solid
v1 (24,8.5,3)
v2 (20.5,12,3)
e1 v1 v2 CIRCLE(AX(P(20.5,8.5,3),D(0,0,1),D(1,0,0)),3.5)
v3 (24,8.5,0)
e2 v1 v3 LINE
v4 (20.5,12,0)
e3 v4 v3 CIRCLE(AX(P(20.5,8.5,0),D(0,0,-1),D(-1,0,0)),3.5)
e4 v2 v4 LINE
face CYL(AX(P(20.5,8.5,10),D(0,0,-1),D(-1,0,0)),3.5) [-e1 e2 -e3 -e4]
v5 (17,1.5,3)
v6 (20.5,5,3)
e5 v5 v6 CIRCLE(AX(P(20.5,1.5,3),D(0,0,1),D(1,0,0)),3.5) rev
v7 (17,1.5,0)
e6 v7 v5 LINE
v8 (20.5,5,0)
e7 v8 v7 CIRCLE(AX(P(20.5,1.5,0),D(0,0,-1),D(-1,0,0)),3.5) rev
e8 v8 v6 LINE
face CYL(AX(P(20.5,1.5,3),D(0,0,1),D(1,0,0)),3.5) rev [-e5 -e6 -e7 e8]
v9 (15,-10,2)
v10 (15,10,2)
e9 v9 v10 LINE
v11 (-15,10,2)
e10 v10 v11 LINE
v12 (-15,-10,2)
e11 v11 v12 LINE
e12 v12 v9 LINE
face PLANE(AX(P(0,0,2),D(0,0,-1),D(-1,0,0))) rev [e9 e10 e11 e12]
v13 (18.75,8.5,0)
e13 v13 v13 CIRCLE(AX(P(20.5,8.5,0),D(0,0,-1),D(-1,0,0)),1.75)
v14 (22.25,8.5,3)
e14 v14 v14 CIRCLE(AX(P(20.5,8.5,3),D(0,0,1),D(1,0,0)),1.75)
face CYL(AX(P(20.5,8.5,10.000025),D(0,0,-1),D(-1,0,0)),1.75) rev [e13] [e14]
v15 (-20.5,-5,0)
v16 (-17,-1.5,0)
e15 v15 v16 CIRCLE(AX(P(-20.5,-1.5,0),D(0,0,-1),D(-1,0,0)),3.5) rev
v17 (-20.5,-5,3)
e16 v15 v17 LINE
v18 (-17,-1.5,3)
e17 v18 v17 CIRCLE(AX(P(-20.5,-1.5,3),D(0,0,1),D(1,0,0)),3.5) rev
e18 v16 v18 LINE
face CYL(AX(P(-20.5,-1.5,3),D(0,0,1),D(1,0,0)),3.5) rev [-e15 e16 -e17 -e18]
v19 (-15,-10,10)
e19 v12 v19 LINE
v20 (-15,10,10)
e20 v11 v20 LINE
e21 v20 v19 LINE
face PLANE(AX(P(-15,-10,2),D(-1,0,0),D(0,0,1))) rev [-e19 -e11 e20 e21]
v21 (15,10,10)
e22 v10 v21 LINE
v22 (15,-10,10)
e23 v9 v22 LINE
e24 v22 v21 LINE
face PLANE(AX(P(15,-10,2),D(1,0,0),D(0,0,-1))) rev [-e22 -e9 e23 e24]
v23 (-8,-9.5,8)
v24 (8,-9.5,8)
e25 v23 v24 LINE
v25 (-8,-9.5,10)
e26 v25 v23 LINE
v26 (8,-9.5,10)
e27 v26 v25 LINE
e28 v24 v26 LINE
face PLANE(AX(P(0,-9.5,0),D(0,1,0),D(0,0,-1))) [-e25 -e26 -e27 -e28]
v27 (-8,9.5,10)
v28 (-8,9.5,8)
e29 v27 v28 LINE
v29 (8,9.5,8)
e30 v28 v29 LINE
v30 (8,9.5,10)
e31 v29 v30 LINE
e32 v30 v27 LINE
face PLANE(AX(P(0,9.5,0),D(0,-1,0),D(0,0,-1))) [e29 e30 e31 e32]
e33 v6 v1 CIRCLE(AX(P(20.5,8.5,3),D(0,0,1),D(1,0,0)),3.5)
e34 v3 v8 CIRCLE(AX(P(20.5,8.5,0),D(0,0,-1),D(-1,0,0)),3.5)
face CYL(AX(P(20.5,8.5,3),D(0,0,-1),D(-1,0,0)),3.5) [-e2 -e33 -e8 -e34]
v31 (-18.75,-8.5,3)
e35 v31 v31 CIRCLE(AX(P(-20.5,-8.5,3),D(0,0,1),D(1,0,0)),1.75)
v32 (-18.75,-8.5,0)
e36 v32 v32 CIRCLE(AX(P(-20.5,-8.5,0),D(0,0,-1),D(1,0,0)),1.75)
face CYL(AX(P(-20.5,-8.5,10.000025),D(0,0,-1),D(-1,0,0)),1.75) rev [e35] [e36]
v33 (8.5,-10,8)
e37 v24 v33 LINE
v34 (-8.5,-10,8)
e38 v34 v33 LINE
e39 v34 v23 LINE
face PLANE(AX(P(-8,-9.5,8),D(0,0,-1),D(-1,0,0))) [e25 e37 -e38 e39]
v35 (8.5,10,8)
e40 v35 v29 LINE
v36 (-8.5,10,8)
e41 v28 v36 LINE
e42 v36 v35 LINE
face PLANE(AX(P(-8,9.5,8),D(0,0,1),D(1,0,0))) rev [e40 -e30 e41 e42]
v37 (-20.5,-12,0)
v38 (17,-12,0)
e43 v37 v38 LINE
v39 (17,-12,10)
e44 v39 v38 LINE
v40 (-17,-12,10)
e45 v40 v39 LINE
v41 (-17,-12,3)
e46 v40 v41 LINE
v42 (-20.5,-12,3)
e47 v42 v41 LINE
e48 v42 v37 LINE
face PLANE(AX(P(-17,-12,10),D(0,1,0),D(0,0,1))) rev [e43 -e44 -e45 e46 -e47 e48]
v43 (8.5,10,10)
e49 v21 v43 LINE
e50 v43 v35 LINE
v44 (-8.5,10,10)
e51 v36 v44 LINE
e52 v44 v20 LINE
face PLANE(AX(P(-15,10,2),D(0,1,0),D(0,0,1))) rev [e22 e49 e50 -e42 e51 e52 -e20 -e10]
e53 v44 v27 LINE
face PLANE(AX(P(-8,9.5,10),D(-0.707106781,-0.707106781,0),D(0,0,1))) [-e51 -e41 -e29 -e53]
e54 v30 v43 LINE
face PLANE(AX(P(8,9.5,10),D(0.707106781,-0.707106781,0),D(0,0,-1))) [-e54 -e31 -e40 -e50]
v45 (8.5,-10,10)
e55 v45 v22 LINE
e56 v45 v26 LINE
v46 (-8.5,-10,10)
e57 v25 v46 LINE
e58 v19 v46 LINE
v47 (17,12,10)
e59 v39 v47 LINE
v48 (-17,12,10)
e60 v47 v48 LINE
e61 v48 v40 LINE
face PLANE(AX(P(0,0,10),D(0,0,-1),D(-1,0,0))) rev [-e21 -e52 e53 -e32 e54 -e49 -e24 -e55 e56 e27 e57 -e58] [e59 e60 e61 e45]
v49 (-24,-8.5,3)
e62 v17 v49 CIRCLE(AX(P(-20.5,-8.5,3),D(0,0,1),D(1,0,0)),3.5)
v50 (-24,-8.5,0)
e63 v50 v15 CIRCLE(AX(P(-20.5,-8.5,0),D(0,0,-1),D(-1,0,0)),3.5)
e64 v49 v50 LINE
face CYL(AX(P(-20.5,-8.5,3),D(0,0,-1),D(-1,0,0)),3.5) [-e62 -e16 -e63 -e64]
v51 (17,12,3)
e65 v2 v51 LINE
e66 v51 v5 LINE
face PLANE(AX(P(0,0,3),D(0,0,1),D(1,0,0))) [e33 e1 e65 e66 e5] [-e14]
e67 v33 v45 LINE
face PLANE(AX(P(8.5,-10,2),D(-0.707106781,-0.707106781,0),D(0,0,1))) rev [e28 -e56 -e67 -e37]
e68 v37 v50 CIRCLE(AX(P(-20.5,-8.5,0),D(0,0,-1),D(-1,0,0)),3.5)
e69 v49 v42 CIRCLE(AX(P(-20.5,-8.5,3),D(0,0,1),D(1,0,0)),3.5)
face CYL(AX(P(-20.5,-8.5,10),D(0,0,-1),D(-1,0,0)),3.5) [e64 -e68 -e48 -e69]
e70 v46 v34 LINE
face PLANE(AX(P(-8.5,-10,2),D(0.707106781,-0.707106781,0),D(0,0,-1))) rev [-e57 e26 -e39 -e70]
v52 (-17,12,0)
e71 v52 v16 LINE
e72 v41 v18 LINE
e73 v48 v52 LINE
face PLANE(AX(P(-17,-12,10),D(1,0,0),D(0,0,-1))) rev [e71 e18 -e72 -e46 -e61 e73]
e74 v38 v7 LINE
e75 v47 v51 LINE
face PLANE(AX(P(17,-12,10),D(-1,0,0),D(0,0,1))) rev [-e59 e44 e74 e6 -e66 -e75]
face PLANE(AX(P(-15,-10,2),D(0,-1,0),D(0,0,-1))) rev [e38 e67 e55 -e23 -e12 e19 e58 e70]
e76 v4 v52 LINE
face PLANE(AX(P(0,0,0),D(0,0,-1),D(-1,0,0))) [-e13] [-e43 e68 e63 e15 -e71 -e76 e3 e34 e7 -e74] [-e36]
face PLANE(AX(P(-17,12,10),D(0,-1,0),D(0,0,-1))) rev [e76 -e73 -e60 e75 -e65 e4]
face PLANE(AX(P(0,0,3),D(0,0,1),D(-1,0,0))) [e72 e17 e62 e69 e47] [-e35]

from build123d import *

# Parameters (mm, degrees)
SKETCH1_W                = 34
SKETCH1_H                = 24
BOSS_EXTRUDE1_DEPTH      = 10
SKETCH2_W                = 30
SKETCH2_H                = 20
CUT_EXTRUDE1_DEPTH       = 8
SKETCH3_W                = 16
SKETCH3_H                = 2
BOSS_EXTRUDE2_DEPTH      = 0.5
CHAMFER1_SIZE            = 0.5
SKETCH4_W                = 7
SKETCH4_H                = 7
BOSS_EXTRUDE3_DEPTH      = 3
FILLET1_R                = 3.5
SKETCH6_R                = 1.75
CUT_EXTRUDE2_DEPTH       = 29.635642127
CIRPATTERN2_COUNT        = 2
FILLET1_OF_CIRPATTERN2_R = 3.5
FILLET2_R                = 3.5


with BuildPart() as part:
    # Sketch1 → Boss-Extrude1 (new body)
    with BuildSketch(Plane.XY):
        Rectangle(SKETCH1_W, SKETCH1_H)
    extrude(amount=BOSS_EXTRUDE1_DEPTH)

    # Sketch2 → Cut-Extrude1 (cut)
    with BuildSketch(Plane.XY.offset(10)):
        Rectangle(SKETCH2_W, SKETCH2_H)
    extrude(amount=-CUT_EXTRUDE1_DEPTH, mode=Mode.SUBTRACT)

    # Sketch3 → Boss-Extrude2 (add)
    with BuildSketch(Plane.XZ.offset(-10)):
        with Locations((0, 9)):
            Rectangle(SKETCH3_W, SKETCH3_H)
    boss_extrude2 = extrude(amount=BOSS_EXTRUDE2_DEPTH)

    # Mirror1: Boss-Extrude2 across plane
    add(boss_extrude2.mirror(Plane.ZX))

    # Chamfer1
    chamfer1_edges = [part.edges().sort_by_distance(p)[0] for p in [
        (8, 10, 9),
        (-8, 10, 9),
        (-8, -10, 9),
        (8, -10, 9),
    ]]
    chamfer(chamfer1_edges, length=CHAMFER1_SIZE - 0.0001)  # a hair under: the kernel refuses the full size

    # Sketch4 → Boss-Extrude3 (add)
    with BuildSketch(Plane.XY):
        with Locations((20.5, 8.5)):
            Rectangle(SKETCH4_W, SKETCH4_H)
    boss_extrude3 = extrude(amount=BOSS_EXTRUDE3_DEPTH)

    # Fillet1
    fillet1_edges = [part.edges().sort_by_distance(p)[0] for p in [
        (24, 12, 1.5),
        (24, 5, 1.5),
    ]]
    fillet(fillet1_edges, radius=FILLET1_R - 0.0001)  # a hair under: the kernel refuses the full size

    # Sketch6 → Cut-Extrude2 (cut, through all)
    with BuildSketch(Plane(origin=(0, 0, 0), x_dir=(-1, 0, 0), z_dir=(0, 0, -1))):
        with Locations((-20.5, 8.5)):
            Circle(SKETCH6_R)
    cut_extrude2 = extrude(amount=-CUT_EXTRUDE2_DEPTH, mode=Mode.SUBTRACT)

    # CirPattern2: Boss-Extrude3, Cut-Extrude2 ×2 about axis
    cirpattern2_axis = Axis((0, 0, 0), (0, 0, 1))
    add([boss_extrude3.rotate(cirpattern2_axis, i * 360 / CIRPATTERN2_COUNT) for i in range(1, CIRPATTERN2_COUNT)])
    add([cut_extrude2.rotate(cirpattern2_axis, i * 360 / CIRPATTERN2_COUNT) for i in range(1, CIRPATTERN2_COUNT)], mode=Mode.SUBTRACT)

    # Fillet1 of CirPattern2
    fillet1_of_cirpattern2_edges = [part.edges().sort_by_distance(p)[0] for p in [
        (-24, -12, 1.5),
        (-24, -5, 1.5),
    ]]
    fillet(fillet1_of_cirpattern2_edges, radius=FILLET1_OF_CIRPATTERN2_R - 0.0001)  # a hair under: the kernel refuses the full size

    # Fillet2
    fillet2_edges = [part.edges().sort_by_distance(p)[0] for p in [
        (-17, -5, 1.5),
        (17, 5, 1.5),
    ]]
    fillet(fillet2_edges, radius=FILLET2_R)


solid = part.part
